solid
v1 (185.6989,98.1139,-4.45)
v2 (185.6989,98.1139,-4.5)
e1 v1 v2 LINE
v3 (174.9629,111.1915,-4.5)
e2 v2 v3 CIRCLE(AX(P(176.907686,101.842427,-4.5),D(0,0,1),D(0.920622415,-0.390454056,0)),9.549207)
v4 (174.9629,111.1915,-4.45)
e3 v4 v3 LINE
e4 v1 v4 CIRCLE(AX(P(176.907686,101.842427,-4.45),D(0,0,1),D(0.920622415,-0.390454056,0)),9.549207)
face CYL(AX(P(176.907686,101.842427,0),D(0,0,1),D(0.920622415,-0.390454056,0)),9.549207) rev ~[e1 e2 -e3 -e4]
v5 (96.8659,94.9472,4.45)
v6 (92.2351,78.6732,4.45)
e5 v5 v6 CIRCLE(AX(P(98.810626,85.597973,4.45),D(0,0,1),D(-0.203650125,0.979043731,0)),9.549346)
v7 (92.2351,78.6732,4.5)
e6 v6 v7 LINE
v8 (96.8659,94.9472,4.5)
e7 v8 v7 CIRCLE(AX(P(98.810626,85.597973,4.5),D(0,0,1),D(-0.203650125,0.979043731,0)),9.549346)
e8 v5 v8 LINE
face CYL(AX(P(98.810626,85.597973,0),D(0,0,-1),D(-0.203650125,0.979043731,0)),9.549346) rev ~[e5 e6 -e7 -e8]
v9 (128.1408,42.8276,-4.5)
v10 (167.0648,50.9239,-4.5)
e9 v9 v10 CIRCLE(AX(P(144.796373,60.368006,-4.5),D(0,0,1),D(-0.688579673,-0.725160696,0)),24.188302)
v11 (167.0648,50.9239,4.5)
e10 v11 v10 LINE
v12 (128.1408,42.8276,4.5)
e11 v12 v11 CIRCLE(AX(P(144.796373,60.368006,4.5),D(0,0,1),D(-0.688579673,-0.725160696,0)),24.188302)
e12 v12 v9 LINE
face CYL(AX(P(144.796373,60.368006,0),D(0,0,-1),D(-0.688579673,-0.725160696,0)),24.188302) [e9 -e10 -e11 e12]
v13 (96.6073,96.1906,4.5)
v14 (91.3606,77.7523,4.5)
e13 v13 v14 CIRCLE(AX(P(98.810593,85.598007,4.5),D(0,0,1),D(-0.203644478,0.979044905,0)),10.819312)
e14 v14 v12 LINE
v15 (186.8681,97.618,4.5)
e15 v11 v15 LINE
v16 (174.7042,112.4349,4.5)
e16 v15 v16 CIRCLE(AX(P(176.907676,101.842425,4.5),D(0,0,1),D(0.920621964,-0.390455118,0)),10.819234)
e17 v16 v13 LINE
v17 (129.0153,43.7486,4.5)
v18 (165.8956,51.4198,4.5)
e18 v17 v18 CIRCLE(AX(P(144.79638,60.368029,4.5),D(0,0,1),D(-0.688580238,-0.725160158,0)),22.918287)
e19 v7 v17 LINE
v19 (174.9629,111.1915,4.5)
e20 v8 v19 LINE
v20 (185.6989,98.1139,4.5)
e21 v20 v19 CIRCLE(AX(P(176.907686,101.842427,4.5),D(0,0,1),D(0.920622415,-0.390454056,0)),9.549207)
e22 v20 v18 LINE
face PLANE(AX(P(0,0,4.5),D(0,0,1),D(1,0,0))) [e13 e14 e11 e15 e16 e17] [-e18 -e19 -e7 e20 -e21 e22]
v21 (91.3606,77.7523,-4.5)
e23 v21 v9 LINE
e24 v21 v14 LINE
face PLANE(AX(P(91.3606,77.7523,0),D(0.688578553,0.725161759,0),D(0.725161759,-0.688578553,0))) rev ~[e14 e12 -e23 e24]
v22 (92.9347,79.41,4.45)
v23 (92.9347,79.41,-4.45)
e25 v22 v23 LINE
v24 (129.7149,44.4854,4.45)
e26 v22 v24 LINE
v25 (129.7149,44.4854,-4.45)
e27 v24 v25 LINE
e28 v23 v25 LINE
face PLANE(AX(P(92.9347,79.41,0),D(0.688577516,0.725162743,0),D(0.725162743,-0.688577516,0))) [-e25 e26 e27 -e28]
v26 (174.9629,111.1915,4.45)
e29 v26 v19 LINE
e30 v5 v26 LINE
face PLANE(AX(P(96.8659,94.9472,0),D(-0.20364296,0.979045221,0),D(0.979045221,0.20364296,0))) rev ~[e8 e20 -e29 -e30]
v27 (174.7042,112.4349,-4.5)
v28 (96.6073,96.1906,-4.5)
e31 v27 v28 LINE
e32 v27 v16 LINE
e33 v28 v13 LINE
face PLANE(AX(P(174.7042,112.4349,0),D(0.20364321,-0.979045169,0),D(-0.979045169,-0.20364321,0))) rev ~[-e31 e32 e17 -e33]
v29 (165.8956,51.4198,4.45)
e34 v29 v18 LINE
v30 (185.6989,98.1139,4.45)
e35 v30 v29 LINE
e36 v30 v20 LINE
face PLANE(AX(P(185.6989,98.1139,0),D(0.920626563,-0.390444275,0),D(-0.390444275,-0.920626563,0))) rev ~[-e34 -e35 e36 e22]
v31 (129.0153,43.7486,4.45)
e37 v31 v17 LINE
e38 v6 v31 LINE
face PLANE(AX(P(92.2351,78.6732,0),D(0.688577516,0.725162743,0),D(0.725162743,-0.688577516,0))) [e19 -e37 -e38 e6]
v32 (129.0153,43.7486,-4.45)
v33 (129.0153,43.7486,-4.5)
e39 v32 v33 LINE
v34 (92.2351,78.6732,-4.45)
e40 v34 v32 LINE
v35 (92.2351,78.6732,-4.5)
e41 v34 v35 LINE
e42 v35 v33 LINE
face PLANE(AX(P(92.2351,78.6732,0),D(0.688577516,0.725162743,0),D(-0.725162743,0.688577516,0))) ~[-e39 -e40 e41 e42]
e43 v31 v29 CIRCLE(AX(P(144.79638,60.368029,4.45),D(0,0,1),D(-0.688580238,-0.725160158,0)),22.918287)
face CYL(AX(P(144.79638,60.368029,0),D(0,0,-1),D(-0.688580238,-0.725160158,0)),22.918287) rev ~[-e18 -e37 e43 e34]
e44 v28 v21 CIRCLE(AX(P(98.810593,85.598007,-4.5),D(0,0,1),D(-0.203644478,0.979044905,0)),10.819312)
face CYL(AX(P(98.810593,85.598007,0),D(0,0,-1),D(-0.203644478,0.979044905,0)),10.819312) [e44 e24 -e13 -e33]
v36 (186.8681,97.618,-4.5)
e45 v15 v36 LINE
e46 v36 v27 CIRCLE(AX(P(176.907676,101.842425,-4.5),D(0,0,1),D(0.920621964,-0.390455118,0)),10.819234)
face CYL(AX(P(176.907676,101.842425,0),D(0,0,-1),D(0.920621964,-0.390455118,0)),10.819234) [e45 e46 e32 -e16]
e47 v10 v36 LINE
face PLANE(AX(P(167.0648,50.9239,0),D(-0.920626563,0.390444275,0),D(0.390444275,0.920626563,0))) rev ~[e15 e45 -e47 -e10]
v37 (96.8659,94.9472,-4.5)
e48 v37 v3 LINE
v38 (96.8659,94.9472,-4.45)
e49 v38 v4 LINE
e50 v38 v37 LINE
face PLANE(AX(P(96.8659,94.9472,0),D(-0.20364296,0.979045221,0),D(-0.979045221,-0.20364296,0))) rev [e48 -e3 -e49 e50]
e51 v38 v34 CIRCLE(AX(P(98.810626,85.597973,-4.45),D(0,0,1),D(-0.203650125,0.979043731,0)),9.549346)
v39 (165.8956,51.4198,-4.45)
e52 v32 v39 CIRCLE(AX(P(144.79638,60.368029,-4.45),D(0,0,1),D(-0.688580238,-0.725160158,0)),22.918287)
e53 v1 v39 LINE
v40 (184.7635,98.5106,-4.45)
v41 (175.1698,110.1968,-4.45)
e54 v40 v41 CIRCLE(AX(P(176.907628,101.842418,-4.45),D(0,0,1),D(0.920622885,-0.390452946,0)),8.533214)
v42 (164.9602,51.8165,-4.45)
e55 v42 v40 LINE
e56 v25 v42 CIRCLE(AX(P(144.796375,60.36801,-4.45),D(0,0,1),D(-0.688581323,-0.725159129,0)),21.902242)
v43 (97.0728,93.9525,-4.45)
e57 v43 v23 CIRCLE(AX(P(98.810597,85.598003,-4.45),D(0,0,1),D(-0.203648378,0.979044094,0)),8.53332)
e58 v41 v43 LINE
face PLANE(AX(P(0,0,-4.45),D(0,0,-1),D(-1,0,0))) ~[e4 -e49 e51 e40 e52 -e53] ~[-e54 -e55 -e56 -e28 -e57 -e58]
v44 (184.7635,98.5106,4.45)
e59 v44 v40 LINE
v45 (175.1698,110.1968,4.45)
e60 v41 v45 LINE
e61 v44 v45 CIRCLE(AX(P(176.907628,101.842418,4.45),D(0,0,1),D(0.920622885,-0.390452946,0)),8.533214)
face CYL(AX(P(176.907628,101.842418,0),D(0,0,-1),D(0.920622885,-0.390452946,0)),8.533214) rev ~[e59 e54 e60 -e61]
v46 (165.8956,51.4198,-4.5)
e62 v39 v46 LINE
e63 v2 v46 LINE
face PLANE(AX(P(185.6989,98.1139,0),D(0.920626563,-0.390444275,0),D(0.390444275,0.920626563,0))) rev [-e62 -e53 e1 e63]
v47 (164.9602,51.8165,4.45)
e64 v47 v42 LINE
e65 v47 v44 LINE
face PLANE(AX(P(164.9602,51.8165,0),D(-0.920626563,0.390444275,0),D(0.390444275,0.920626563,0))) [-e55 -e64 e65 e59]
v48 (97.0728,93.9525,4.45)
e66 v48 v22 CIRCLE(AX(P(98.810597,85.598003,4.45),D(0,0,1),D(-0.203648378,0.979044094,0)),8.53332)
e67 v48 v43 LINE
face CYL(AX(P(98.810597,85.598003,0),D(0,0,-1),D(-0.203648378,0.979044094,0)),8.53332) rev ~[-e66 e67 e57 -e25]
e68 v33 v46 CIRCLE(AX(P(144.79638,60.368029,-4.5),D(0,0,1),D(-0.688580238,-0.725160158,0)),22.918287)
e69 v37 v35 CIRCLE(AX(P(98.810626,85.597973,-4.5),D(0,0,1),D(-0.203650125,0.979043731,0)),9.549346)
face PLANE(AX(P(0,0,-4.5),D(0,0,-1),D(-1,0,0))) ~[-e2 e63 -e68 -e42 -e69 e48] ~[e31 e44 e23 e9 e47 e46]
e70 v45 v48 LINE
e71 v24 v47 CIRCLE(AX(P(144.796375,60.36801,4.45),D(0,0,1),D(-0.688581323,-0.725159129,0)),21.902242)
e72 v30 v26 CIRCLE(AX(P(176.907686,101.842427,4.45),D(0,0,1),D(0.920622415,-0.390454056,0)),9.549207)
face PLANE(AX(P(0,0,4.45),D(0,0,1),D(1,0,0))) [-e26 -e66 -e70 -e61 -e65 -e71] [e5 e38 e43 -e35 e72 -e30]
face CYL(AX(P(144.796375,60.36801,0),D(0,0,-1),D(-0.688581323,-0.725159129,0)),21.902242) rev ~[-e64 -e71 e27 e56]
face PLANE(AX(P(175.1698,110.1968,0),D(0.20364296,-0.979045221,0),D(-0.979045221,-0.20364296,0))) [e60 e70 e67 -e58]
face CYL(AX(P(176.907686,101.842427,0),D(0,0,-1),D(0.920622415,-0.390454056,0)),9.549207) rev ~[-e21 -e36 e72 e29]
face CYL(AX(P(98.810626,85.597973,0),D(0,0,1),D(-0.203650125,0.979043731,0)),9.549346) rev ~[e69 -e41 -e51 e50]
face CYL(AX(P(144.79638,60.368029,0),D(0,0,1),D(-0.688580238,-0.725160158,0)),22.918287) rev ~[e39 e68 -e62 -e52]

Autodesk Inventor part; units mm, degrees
ref_plane "YZ Plane" through (0, 0, 0) normal (1, 0, 0) x (0, 1, 0)
ref_plane "XZ Plane" through (0, 0, 0) normal (0, 1, 0) x (-1, 0, 0)
ref_plane "XY Plane" through (0, 0, 0) normal (0, 0, 1) x (1, 0, 0)
sketch "Main Outline" plane through (0, 0, 0) normal (0, 0, 1) x (1, 0, 0)
  line L0 (0, 0) -> (304.8, 0) construction
  line L1 (304.8, 0) -> (304.8, 50.8) construction
  line L2 (304.8, 50.8) -> (0, 50.8) construction
  line L3 (0, 50.8) -> (0, 0) construction
  line L4 (0, 50.8) -> (0, 53.34) construction
  line L5 (0, 53.34) -> (304.8, 53.34) construction
  line L6 (304.8, 53.34) -> (304.8, 50.8) construction
  circle A0 centre (152.4, 23.8125) radius 17.4625 construction
  line L7 (152.4, 23.8125) -> (152.4, 0) construction
  circle A1 centre (152.4, 23.8125) radius 27.94 construction
  circle A2 centre (152.4, 23.8125) radius 21.59 construction
  line L8 (152.4, 23.8125) -> (144.7964, 60.3681) construction
  circle A3 centre (144.7964, 60.3681) radius 15.24 construction
  circle A4 centre (144.7964, 60.3681) radius 8.89 construction
  circle A5 centre (144.7964, 60.3681) radius 14.2875 construction
  arc A6 (164.6591, 71.8014) -> (129.0153, 43.7486) centre (144.7964, 60.3681) ccw construction
  circle A7 centre (98.8106, 85.598) radius 32.258 construction
  circle A8 centre (126.6733, 147.4971) radius 32.258 construction
  circle A9 centre (176.9075, 101.8424) radius 32.258 construction
  circle A10 centre (144.7964, 60.3681) radius 11.1125 construction
  circle A11 centre (152.4, 23.8125) radius 49.53 construction
  line L9 (144.7964, 60.3681) -> (126.6733, 147.4971) construction
  line L10 (144.7964, 60.3681) -> (98.8106, 85.598) construction
  line L11 (98.8106, 85.598) -> (176.9075, 101.8424) construction
  line L12 (176.9075, 101.8424) -> (144.7964, 60.3681) construction
  circle A12 centre (98.8106, 85.598) radius 9.5493 construction
  arc A13 (174.9629, 111.1915) -> (185.6989, 98.1139) centre (176.9075, 101.8424) ccw construction
  circle A14 centre (126.6733, 147.4971) radius 9.5493 construction
  line L13 (96.8659, 94.9472) -> (174.9629, 111.1915) construction
  line L14 (185.6989, 98.1139) -> (165.8956, 51.4198) construction
  line L15 (92.2351, 78.6732) -> (129.0153, 43.7486) construction
  line L16 (174.9629, 111.1915) -> (176.9075, 101.8424) construction
  line L17 (176.9075, 101.8424) -> (185.6989, 98.1139) construction
  arc A15 (185.6989, 98.1139) -> (174.9629, 111.1915) centre (176.9075, 101.8424) ccw construction
  arc A16 (165.8956, 51.4198) -> (164.6591, 71.8014) centre (144.7964, 60.3681) ccw construction
  arc A17 (129.0153, 43.7486) -> (165.8956, 51.4198) centre (144.7964, 60.3681) ccw construction
  circle A18 centre (126.6086, 147.808) radius 32.258 construction
  circle A19 centre (126.544, 148.1188) radius 32.258 construction
  circle A20 centre (126.4793, 148.4297) radius 32.258 construction
  line L18 (126.6733, 147.4971) -> (126.4793, 148.4297) construction
  circle A21 centre (126.738, 147.1863) radius 32.258 construction
  circle A22 centre (117.4622, 43.2997) radius 9.525 construction
  circle A23 centre (176.6694, 55.615) radius 9.525 construction
  line L19 (152.4, 23.8125) -> (117.4622, 43.2997) construction
  line L20 (152.4, 23.8125) -> (176.6694, 55.615) construction
  line L21 (117.4622, 43.2997) -> (98.8106, 85.598) construction
  line L22 (176.6694, 55.615) -> (176.9075, 101.8424) construction
  circle A24 centre (135.1821, 106.5897) radius 7.9375 construction
  line L23 (135.6243, 150.8242) -> (166.2787, 68.353) construction
  circle A25 centre (152.4, 23.8125) radius 29.845 construction
  line L24 (117.1381, 146.979) -> (121.9118, 59.1246) construction
  circle A26 centre (99.0889, 85.4453) radius 32.258 construction
  circle A27 centre (97.9755, 86.0562) radius 32.258 construction
  line L25 (97.9755, 86.0562) -> (98.8106, 85.598) construction
  circle A28 centre (98.2538, 85.9034) radius 32.258 construction
  circle A29 centre (98.5322, 85.7507) radius 32.258 construction
  circle A30 centre (152.4, 23.8125) radius 29.845 construction
  circle A31 centre (122.555, 23.8125) radius 6.35 construction
  circle A32 centre (179.7696, 35.7133) radius 6.35 construction
  line L26 (122.555, 23.8125) -> (152.4, 23.8125) construction
  line L27 (152.4, 23.8125) -> (182.245, 23.8125) construction
  circle A33 centre (182.245, 23.8125) radius 6.35 construction
  circle A34 centre (125.0304, 11.9117) radius 6.35 construction
  circle A35 centre (150.4199, 33.3321) radius 39.5684 construction
  line L28 (72.9795, 65.6655) -> (119.7593, 8.3204) construction
  circle A36 centre (177.4906, 102.5955) radius 32.258 construction
  line L29 (176.9075, 101.8424) -> (177.4906, 102.5955) construction
  circle A37 centre (177.2963, 102.3445) radius 32.258 construction
  circle A38 centre (177.1019, 102.0934) radius 32.258 construction
  circle A39 centre (176.7131, 101.5913) radius 32.258 construction
  line L30 (188.5109, 22.6209) -> (208.5442, 93.8632) construction
  circle A40 centre (135.1821, 106.5897) radius 9.5727 construction
  arc A41 (86.8202, 116.3239) -> (96.3065, 136.4856) centre (81.3304, 131.2195) ccw construction
  arc A42 (158.9123, 149.5077) -> (175.6513, 134.801) centre (174.7462, 150.6502) ccw construction
  line L31 (126.4793, 148.4297) -> (126.9966, 145.9429) construction
  line L32 (116.5322, 146.3607) -> (117.0495, 143.8739) construction
  line L33 (136.9437, 148.0119) -> (136.4264, 150.4987) construction
  arc A43 (136.4264, 150.4987) -> (116.5322, 146.3607) centre (126.4793, 148.4297) ccw construction
  arc A44 (117.0495, 143.8739) -> (136.9437, 148.0119) centre (126.9966, 145.9429) ccw construction
  line L34 (177.4906, 102.5955) -> (175.9357, 100.5871) construction
  line L35 (169.4571, 108.8154) -> (167.9021, 106.807) construction
  line L36 (183.9692, 94.3672) -> (185.5242, 96.3756) construction
  arc A45 (185.5242, 96.3756) -> (169.4571, 108.8154) centre (177.4906, 102.5955) ccw construction
  arc A46 (167.9021, 106.807) -> (183.9692, 94.3672) centre (175.9357, 100.5871) ccw construction
  line L37 (97.9755, 86.0562) -> (100.2023, 84.8344) construction
  line L38 (93.0884, 77.1487) -> (95.3153, 75.927) construction
  line L39 (105.0894, 93.7418) -> (102.8625, 94.9636) construction
  arc A47 (102.8625, 94.9636) -> (93.0884, 77.1487) centre (97.9755, 86.0562) ccw construction
  arc A48 (95.3153, 75.927) -> (105.0894, 93.7418) centre (100.2023, 84.8344) ccw construction
  circle A49 centre (117.4622, 43.2997) radius 3.9687 construction
  circle A50 centre (176.6694, 55.615) radius 3.9687 construction
  line L40 (152.4, 23.8125) -> (158.4777, -5.4071) construction
  arc A51 (89.4797, 54.6517) -> (86.0737, 49.6139) centre (88.534, 51.6209) ccw construction
  arc A52 (202.9367, 73.9217) -> (197.8043, 77.1835) centre (199.8802, 74.7812) ccw construction
  circle A53 centre (152.4, 23.8125) radius 14.224 construction
  circle A54 centre (135.1821, 106.5897) radius 3.9687 construction
  circle A55 centre (156.538, 3.9183) radius 6.35 construction
  circle A56 centre (156.538, 3.9183) radius 2.0828 construction
  circle A57 centre (152.4, 23.8125) radius 20.32 construction
  line L41 (133.1021, 30.1759) -> (152.4, 23.8125) construction
  line L42 (152.4, 23.8125) -> (167.5599, 37.3432) construction
  circle A58 centre (167.5599, 37.3432) radius 2.0828 construction
  circle A59 centre (167.5599, 37.3432) radius 3.9687 construction
  circle A60 centre (133.1021, 30.1759) radius 2.0828 construction
  circle A61 centre (133.1021, 30.1759) radius 3.9688 construction
  point P0 (126.738, 147.1863)
  point P1 (176.7131, 101.5913)
  dimension "d18" = 99.06
  dimension "d58" = 64.516
  dimension "d86" = 64.516
  dimension "d0" = 304.8
  dimension "d1" = 50.8
  dimension "d2" = 2.54
  dimension "d3" = 34.925
  dimension "d4" = 23.8125
  dimension "d5" = 152.4
  dimension "d6" = 55.88
  dimension "d7" = 43.18
  dimension "d8" = 37.338
  dimension "d10" = 30.48
  dimension "d11" = 17.78
  dimension "d12" = 28.575
  dimension "d13" = 45.8366
  dimension "d14" = 64.516
  dimension "d15" = 64.516
  dimension "d16" = 64.516
  dimension "d17" = 22.225
  dimension "d19" = 52.4523
  dimension "d20" = 88.9939
  dimension "d21" = 19.0986
  dimension "d22" = 19.0986
  dimension "d23" = 19.0986
  dimension "d30" = 124.732
  dimension "d40" = 64.516
  dimension "d41" = 64.516
  dimension "d42" = 64.516
  dimension "d43" = 0.9525
  dimension "d44" = 0.3175
  dimension "d45" = 0.635
  dimension "d46" = 64.516
  dimension "d47" = 0.3175
  dimension "d48" = 19.05
  dimension "d49" = 19.05
  dimension "d50" = 40.005
  dimension "d51" = 40.005
  dimension "d52" = 46.228
  dimension "d54" = 46.228
  dimension "d55" = 15.875
  dimension "d56" = 41.4655
  dimension "d57" = 59.69
  dimension "d59" = 64.516
  dimension "d60" = 64.516
  dimension "d61" = 64.516
  dimension "d62" = 0.3175
  dimension "d63" = 0.3175
  dimension "d64" = 0.635
  dimension "d65" = 0.9525
  dimension "d73" = 12.7
  dimension "d74" = 12.7
  dimension "d76" = 59.69
  dimension "d78" = 12.7
  dimension "d79" = 12.7
  dimension "d80" = 64.516
  dimension "d81" = 0.9525
  dimension "d82" = 64.516
  dimension "d83" = 64.516
  dimension "d84" = 0.3175
  dimension "d85" = 0.635
  dimension "d88" = 0.3175
  dimension "d89" = 31.75
  dimension "d90" = 31.75
  dimension "d94" = 1.5875
  dimension "d95" = 20.32
  dimension "d96" = 1.5875
sketch "Upper CIM C-C Check" plane through (0, 0, 0) normal (0, 0, 1) x (1, 0, 0)
  arc A0 (3.4429, -22.6582) -> (3.4429, 22.6582) centre (0, 0) ccw construction
  arc A1 (90.4285, 9.4409) -> (90.4285, -9.4409) centre (88.9939, 0) ccw construction
  line L0 (88.9939, 0) -> (0, 0) construction
  line L1 (90.4285, 9.4409) -> (3.4429, 22.6582)
  line L2 (3.4429, -22.6582) -> (90.4285, -9.4409)
  arc A2 (90.4285, -9.4409) -> (90.4285, 9.4409) centre (88.9939, 0) ccw
  arc A3 (3.4429, 22.6582) -> (3.4429, -22.6582) centre (0, 0) ccw
  dimension "d24" = 45.8366
  dimension "d25" = 19.0986
  dimension "d26" = 78.9119
  dimension "d27" = 87.984
  dimension "d28" = 27.12
  dimension "d29" = 88.9939
sketch "Sketch3" plane through (0, 0, 0) normal (0, 0, 1) x (1, 0, 0)
  line L0 (96.8659, 94.9472) -> (174.9629, 111.1915) projected
  line L1 (185.6989, 98.1139) -> (165.8956, 51.4198) projected
  line L2 (92.2351, 78.6732) -> (129.0153, 43.7486) projected
  arc A0 (96.8659, 94.9472) -> (92.2351, 78.6732) centre (98.8106, 85.598) ccw
  arc A1 (185.6989, 98.1139) -> (174.9629, 111.1915) centre (176.9075, 101.8424) ccw
  arc A2 (129.0153, 43.7486) -> (165.8956, 51.4198) centre (144.7964, 60.3681) ccw
  line L3 (175.1698, 110.1968) -> (97.0728, 93.9525)
  arc A3 (97.0728, 93.9525) -> (92.9347, 79.41) centre (98.8106, 85.598) ccw
  line L4 (92.9347, 79.41) -> (129.7149, 44.4854)
  arc A4 (129.7149, 44.4854) -> (164.9602, 51.8165) centre (144.7964, 60.3681) ccw
  line L5 (164.9602, 51.8165) -> (184.7635, 98.5106)
  arc A5 (184.7635, 98.5106) -> (175.1698, 110.1968) centre (176.9075, 101.8424) ccw
  line L6 (174.7042, 112.4349) -> (96.6073, 96.1906)
  arc A6 (96.6073, 96.1906) -> (91.3606, 77.7523) centre (98.8106, 85.598) ccw
  line L7 (91.3606, 77.7523) -> (128.1408, 42.8276)
  arc A7 (128.1408, 42.8276) -> (167.0648, 50.9239) centre (144.7964, 60.3681) ccw
  line L8 (167.0648, 50.9239) -> (186.8681, 97.618)
  arc A8 (186.8681, 97.618) -> (174.7042, 112.4349) centre (176.9075, 101.8424) ccw
  point P0 (0, 0)
  dimension "d115" = 1.27
  dimension "d116" = 1.016
extrude "Extrusion1" add sketch "Sketch3" along normal blind 4.5 contours A8 L8 A7 L7 A6 L6
extrude "Extrusion2" add sketch "Sketch3" along normal blind 4.45 contours L0 A1 L1 A2 L2 A0
mirror "Mirror1" about plane through (140.8105, 79.5306, 0) normal (0, 0, -1)
equation "\"d3\" = r10"
equation "\"d6\" = g44"
equation "\"d7\" = g34"
equation "\"d10\" = g24"
equation "\"d11\" = g14"
equation "\"d12\" = r8"
equation "\"d13\" = p48"
equation "\"d14\" = cim"
equation "\"d15\" = cim"
equation "\"d16\" = cim"
equation "\"d17\" = r6"
equation "\"d21\" = p20"
equation "\"d22\" = p20"
equation "\"d23\" = p20"
equation "\"d24\" = p48"
equation "\"d25\" = p20"
equation "\"d29\" = d20"
equation "\"g14\" = 17.78"
equation "\"g24\" = 30.48"
equation "\"g34\" = 43.18"
equation "\"g44\" = 55.88"
equation "\"p20\" = 19.09859"
equation "\"p48\" = 45.83662"
equation "\"r10\" = 34.925"
equation "\"r9\" = 31.75"
equation "\"r8\" = 28.575"
equation "\"r7\" = 25.4"
equation "\"r6\" = 22.225"
equation "\"r5\" = 19.05"
equation "\"r4\" = 15.875"
equation "\"r3\" = 12.7"
equation "\"cim\" = 64.516"
equation "\"act\" = 28.448"
equation "\"actL\" = 23.749"
equation "\"UpperCimCCCheck\" = 2 * d27 + d26 + d28"
equation "\"LowerBeltPathCCCheck\" = 267"
properties material "Rubber"
